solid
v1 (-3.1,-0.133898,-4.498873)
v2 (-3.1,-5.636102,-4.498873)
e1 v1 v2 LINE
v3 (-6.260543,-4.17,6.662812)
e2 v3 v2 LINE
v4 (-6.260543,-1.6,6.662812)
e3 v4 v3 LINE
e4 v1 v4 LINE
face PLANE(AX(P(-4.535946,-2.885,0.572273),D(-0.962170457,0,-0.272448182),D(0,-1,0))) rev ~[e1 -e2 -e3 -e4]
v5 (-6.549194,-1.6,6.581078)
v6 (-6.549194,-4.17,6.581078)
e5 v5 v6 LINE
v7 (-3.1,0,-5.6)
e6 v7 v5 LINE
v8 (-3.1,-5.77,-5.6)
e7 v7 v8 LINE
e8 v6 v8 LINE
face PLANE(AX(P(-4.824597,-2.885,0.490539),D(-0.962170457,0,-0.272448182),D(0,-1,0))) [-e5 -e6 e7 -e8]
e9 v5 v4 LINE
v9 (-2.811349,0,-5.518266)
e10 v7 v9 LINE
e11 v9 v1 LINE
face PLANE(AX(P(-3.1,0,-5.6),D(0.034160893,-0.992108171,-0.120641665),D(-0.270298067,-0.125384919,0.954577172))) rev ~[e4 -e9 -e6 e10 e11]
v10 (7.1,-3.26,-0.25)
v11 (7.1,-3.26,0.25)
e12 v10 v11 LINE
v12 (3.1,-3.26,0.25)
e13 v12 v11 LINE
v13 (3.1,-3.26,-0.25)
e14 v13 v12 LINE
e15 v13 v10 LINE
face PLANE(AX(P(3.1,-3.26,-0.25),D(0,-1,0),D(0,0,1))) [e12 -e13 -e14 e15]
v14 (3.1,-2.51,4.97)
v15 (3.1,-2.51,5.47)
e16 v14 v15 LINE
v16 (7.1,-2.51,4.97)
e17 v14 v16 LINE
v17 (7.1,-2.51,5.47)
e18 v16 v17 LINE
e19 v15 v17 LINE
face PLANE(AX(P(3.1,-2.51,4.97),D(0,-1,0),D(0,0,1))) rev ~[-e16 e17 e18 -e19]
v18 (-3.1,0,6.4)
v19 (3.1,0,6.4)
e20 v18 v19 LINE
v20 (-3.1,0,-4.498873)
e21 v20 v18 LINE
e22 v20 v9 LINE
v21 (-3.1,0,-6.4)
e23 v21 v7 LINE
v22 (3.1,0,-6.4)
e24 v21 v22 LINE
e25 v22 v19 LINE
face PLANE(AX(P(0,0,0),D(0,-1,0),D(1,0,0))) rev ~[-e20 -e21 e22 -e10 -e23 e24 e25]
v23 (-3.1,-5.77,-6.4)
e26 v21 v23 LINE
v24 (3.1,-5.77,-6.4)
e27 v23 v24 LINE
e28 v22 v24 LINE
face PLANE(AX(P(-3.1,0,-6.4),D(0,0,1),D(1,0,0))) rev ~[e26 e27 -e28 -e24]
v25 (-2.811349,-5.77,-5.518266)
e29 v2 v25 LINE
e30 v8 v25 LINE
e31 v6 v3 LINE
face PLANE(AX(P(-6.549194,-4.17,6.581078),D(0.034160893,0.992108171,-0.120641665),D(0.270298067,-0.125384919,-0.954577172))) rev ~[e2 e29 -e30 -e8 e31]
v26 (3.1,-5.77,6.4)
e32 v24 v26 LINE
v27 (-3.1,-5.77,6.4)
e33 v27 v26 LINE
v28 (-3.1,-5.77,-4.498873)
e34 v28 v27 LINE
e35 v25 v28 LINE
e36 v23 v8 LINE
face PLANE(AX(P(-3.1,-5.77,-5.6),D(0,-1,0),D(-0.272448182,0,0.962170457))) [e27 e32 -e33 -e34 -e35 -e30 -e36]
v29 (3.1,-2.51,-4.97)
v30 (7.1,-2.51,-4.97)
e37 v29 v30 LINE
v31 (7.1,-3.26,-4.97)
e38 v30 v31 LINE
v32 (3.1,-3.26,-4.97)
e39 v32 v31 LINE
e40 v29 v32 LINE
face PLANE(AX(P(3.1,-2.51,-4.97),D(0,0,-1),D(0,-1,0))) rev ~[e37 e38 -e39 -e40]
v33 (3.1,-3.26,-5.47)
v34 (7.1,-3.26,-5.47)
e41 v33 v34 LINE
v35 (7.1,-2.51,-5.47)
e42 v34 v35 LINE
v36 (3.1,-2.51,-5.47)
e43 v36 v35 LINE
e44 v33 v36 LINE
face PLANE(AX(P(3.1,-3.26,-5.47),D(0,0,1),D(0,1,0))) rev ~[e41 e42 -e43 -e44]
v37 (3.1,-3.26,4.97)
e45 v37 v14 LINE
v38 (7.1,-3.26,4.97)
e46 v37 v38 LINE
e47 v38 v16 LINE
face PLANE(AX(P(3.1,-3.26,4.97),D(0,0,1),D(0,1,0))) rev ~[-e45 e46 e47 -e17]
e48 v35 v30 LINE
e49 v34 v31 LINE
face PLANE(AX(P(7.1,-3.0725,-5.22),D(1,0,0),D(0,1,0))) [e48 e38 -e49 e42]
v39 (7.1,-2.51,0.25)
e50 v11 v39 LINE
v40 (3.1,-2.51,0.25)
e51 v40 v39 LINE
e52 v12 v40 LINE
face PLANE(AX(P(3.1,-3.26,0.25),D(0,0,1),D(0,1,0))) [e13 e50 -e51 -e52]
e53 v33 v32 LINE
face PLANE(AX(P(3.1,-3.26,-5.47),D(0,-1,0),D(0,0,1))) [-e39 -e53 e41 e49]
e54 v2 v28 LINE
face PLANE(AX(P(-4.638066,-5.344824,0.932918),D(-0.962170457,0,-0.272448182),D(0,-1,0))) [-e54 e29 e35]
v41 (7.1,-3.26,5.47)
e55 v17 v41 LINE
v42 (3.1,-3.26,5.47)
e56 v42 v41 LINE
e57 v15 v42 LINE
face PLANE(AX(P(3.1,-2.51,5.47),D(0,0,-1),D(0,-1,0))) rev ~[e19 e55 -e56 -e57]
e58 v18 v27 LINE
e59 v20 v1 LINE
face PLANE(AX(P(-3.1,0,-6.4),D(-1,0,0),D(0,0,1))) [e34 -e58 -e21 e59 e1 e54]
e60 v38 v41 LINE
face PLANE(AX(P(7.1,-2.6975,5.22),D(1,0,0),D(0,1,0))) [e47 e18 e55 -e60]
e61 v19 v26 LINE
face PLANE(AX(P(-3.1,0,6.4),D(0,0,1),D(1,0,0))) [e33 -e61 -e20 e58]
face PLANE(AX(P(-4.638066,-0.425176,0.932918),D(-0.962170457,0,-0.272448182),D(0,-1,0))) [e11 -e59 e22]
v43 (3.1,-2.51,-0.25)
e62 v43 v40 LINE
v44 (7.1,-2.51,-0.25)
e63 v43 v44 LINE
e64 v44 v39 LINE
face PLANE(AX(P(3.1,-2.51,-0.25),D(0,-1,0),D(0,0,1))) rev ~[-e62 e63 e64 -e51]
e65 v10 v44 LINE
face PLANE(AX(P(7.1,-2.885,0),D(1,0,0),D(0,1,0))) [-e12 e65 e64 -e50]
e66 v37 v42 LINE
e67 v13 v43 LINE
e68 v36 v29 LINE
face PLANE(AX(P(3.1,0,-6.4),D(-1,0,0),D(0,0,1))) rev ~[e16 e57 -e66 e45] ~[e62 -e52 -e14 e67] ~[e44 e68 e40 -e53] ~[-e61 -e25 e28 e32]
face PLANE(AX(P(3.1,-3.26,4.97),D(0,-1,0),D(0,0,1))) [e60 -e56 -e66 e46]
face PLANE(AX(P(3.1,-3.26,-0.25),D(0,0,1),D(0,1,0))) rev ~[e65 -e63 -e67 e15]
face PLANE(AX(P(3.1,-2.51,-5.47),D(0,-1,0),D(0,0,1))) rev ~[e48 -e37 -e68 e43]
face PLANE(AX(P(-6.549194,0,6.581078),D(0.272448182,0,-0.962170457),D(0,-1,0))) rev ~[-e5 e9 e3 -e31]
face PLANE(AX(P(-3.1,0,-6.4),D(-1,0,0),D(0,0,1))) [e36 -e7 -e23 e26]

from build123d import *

# Parameters (mm, degrees)
F0_W     = 6.2
F0_H     = 12.8
F1_DEPTH = 5.77
F2_W     = 0.375
F2_H     = 0.5
F2_W_2   = 0.75
F3_DEPTH = 4
F6_W     = 5.77
F6_H     = 12.66
F7_DEPTH = 0.3
F9_DEPTH = 0.3


# Not quite as in the source:
# - the program builds the solid bodies; features that only make, move or delete a surface that nothing else refers to are left out


with BuildPart() as f1:
    # F0 (on Front) → F1 (new body)
    with BuildSketch(Plane.XZ):
        Rectangle(F0_W, F0_H)
    extrude(amount=F1_DEPTH)

    # F2 (on face) → F3 (join)
    with BuildSketch(Plane.YZ.offset(3.1)):
        with Locations((-2.6975, 5.22)):
            Rectangle(F2_W, F2_H)
        with Locations((-3.0725, 5.22)):
            Rectangle(F2_W, F2_H)
        with Locations((-2.885, 0)):
            Rectangle(F2_W_2, F2_H)
        with Locations((-3.0725, -5.22)):
            Rectangle(F2_W, F2_H)
        with Locations((-2.6975, -5.22)):
            Rectangle(F2_W, F2_H)
    extrude(amount=F3_DEPTH)

    # F6 (on face) → F7 (join)
    with BuildSketch(Plane(origin=(-4.3378860758, 0, -1.2283157987), x_dir=(0, -1, 0), z_dir=(-0.962170457, 0, -0.2724481816))):
        with Locations((2.885, 1.7864348038)):
            Rectangle(F6_W, F6_H)
    extrude(amount=-F7_DEPTH)

    # F8 (on face) → F9 (cut, through all)
    with BuildSketch(Plane(origin=(-4.3378860758, 0, -1.2283157987), x_dir=(0, -1, 0), z_dir=(-0.962170457, 0, -0.2724481816))):
        Polygon((0, -4.5435651962), (1.6, 8.1164348038), (0, 8.1164348038), align=None)
        Polygon((4.17, 8.1164348038), (5.77, -4.5435651962), (5.77, 8.1164348038), align=None)
    extrude(amount=-F9_DEPTH, mode=Mode.SUBTRACT)


solid = f1.part
